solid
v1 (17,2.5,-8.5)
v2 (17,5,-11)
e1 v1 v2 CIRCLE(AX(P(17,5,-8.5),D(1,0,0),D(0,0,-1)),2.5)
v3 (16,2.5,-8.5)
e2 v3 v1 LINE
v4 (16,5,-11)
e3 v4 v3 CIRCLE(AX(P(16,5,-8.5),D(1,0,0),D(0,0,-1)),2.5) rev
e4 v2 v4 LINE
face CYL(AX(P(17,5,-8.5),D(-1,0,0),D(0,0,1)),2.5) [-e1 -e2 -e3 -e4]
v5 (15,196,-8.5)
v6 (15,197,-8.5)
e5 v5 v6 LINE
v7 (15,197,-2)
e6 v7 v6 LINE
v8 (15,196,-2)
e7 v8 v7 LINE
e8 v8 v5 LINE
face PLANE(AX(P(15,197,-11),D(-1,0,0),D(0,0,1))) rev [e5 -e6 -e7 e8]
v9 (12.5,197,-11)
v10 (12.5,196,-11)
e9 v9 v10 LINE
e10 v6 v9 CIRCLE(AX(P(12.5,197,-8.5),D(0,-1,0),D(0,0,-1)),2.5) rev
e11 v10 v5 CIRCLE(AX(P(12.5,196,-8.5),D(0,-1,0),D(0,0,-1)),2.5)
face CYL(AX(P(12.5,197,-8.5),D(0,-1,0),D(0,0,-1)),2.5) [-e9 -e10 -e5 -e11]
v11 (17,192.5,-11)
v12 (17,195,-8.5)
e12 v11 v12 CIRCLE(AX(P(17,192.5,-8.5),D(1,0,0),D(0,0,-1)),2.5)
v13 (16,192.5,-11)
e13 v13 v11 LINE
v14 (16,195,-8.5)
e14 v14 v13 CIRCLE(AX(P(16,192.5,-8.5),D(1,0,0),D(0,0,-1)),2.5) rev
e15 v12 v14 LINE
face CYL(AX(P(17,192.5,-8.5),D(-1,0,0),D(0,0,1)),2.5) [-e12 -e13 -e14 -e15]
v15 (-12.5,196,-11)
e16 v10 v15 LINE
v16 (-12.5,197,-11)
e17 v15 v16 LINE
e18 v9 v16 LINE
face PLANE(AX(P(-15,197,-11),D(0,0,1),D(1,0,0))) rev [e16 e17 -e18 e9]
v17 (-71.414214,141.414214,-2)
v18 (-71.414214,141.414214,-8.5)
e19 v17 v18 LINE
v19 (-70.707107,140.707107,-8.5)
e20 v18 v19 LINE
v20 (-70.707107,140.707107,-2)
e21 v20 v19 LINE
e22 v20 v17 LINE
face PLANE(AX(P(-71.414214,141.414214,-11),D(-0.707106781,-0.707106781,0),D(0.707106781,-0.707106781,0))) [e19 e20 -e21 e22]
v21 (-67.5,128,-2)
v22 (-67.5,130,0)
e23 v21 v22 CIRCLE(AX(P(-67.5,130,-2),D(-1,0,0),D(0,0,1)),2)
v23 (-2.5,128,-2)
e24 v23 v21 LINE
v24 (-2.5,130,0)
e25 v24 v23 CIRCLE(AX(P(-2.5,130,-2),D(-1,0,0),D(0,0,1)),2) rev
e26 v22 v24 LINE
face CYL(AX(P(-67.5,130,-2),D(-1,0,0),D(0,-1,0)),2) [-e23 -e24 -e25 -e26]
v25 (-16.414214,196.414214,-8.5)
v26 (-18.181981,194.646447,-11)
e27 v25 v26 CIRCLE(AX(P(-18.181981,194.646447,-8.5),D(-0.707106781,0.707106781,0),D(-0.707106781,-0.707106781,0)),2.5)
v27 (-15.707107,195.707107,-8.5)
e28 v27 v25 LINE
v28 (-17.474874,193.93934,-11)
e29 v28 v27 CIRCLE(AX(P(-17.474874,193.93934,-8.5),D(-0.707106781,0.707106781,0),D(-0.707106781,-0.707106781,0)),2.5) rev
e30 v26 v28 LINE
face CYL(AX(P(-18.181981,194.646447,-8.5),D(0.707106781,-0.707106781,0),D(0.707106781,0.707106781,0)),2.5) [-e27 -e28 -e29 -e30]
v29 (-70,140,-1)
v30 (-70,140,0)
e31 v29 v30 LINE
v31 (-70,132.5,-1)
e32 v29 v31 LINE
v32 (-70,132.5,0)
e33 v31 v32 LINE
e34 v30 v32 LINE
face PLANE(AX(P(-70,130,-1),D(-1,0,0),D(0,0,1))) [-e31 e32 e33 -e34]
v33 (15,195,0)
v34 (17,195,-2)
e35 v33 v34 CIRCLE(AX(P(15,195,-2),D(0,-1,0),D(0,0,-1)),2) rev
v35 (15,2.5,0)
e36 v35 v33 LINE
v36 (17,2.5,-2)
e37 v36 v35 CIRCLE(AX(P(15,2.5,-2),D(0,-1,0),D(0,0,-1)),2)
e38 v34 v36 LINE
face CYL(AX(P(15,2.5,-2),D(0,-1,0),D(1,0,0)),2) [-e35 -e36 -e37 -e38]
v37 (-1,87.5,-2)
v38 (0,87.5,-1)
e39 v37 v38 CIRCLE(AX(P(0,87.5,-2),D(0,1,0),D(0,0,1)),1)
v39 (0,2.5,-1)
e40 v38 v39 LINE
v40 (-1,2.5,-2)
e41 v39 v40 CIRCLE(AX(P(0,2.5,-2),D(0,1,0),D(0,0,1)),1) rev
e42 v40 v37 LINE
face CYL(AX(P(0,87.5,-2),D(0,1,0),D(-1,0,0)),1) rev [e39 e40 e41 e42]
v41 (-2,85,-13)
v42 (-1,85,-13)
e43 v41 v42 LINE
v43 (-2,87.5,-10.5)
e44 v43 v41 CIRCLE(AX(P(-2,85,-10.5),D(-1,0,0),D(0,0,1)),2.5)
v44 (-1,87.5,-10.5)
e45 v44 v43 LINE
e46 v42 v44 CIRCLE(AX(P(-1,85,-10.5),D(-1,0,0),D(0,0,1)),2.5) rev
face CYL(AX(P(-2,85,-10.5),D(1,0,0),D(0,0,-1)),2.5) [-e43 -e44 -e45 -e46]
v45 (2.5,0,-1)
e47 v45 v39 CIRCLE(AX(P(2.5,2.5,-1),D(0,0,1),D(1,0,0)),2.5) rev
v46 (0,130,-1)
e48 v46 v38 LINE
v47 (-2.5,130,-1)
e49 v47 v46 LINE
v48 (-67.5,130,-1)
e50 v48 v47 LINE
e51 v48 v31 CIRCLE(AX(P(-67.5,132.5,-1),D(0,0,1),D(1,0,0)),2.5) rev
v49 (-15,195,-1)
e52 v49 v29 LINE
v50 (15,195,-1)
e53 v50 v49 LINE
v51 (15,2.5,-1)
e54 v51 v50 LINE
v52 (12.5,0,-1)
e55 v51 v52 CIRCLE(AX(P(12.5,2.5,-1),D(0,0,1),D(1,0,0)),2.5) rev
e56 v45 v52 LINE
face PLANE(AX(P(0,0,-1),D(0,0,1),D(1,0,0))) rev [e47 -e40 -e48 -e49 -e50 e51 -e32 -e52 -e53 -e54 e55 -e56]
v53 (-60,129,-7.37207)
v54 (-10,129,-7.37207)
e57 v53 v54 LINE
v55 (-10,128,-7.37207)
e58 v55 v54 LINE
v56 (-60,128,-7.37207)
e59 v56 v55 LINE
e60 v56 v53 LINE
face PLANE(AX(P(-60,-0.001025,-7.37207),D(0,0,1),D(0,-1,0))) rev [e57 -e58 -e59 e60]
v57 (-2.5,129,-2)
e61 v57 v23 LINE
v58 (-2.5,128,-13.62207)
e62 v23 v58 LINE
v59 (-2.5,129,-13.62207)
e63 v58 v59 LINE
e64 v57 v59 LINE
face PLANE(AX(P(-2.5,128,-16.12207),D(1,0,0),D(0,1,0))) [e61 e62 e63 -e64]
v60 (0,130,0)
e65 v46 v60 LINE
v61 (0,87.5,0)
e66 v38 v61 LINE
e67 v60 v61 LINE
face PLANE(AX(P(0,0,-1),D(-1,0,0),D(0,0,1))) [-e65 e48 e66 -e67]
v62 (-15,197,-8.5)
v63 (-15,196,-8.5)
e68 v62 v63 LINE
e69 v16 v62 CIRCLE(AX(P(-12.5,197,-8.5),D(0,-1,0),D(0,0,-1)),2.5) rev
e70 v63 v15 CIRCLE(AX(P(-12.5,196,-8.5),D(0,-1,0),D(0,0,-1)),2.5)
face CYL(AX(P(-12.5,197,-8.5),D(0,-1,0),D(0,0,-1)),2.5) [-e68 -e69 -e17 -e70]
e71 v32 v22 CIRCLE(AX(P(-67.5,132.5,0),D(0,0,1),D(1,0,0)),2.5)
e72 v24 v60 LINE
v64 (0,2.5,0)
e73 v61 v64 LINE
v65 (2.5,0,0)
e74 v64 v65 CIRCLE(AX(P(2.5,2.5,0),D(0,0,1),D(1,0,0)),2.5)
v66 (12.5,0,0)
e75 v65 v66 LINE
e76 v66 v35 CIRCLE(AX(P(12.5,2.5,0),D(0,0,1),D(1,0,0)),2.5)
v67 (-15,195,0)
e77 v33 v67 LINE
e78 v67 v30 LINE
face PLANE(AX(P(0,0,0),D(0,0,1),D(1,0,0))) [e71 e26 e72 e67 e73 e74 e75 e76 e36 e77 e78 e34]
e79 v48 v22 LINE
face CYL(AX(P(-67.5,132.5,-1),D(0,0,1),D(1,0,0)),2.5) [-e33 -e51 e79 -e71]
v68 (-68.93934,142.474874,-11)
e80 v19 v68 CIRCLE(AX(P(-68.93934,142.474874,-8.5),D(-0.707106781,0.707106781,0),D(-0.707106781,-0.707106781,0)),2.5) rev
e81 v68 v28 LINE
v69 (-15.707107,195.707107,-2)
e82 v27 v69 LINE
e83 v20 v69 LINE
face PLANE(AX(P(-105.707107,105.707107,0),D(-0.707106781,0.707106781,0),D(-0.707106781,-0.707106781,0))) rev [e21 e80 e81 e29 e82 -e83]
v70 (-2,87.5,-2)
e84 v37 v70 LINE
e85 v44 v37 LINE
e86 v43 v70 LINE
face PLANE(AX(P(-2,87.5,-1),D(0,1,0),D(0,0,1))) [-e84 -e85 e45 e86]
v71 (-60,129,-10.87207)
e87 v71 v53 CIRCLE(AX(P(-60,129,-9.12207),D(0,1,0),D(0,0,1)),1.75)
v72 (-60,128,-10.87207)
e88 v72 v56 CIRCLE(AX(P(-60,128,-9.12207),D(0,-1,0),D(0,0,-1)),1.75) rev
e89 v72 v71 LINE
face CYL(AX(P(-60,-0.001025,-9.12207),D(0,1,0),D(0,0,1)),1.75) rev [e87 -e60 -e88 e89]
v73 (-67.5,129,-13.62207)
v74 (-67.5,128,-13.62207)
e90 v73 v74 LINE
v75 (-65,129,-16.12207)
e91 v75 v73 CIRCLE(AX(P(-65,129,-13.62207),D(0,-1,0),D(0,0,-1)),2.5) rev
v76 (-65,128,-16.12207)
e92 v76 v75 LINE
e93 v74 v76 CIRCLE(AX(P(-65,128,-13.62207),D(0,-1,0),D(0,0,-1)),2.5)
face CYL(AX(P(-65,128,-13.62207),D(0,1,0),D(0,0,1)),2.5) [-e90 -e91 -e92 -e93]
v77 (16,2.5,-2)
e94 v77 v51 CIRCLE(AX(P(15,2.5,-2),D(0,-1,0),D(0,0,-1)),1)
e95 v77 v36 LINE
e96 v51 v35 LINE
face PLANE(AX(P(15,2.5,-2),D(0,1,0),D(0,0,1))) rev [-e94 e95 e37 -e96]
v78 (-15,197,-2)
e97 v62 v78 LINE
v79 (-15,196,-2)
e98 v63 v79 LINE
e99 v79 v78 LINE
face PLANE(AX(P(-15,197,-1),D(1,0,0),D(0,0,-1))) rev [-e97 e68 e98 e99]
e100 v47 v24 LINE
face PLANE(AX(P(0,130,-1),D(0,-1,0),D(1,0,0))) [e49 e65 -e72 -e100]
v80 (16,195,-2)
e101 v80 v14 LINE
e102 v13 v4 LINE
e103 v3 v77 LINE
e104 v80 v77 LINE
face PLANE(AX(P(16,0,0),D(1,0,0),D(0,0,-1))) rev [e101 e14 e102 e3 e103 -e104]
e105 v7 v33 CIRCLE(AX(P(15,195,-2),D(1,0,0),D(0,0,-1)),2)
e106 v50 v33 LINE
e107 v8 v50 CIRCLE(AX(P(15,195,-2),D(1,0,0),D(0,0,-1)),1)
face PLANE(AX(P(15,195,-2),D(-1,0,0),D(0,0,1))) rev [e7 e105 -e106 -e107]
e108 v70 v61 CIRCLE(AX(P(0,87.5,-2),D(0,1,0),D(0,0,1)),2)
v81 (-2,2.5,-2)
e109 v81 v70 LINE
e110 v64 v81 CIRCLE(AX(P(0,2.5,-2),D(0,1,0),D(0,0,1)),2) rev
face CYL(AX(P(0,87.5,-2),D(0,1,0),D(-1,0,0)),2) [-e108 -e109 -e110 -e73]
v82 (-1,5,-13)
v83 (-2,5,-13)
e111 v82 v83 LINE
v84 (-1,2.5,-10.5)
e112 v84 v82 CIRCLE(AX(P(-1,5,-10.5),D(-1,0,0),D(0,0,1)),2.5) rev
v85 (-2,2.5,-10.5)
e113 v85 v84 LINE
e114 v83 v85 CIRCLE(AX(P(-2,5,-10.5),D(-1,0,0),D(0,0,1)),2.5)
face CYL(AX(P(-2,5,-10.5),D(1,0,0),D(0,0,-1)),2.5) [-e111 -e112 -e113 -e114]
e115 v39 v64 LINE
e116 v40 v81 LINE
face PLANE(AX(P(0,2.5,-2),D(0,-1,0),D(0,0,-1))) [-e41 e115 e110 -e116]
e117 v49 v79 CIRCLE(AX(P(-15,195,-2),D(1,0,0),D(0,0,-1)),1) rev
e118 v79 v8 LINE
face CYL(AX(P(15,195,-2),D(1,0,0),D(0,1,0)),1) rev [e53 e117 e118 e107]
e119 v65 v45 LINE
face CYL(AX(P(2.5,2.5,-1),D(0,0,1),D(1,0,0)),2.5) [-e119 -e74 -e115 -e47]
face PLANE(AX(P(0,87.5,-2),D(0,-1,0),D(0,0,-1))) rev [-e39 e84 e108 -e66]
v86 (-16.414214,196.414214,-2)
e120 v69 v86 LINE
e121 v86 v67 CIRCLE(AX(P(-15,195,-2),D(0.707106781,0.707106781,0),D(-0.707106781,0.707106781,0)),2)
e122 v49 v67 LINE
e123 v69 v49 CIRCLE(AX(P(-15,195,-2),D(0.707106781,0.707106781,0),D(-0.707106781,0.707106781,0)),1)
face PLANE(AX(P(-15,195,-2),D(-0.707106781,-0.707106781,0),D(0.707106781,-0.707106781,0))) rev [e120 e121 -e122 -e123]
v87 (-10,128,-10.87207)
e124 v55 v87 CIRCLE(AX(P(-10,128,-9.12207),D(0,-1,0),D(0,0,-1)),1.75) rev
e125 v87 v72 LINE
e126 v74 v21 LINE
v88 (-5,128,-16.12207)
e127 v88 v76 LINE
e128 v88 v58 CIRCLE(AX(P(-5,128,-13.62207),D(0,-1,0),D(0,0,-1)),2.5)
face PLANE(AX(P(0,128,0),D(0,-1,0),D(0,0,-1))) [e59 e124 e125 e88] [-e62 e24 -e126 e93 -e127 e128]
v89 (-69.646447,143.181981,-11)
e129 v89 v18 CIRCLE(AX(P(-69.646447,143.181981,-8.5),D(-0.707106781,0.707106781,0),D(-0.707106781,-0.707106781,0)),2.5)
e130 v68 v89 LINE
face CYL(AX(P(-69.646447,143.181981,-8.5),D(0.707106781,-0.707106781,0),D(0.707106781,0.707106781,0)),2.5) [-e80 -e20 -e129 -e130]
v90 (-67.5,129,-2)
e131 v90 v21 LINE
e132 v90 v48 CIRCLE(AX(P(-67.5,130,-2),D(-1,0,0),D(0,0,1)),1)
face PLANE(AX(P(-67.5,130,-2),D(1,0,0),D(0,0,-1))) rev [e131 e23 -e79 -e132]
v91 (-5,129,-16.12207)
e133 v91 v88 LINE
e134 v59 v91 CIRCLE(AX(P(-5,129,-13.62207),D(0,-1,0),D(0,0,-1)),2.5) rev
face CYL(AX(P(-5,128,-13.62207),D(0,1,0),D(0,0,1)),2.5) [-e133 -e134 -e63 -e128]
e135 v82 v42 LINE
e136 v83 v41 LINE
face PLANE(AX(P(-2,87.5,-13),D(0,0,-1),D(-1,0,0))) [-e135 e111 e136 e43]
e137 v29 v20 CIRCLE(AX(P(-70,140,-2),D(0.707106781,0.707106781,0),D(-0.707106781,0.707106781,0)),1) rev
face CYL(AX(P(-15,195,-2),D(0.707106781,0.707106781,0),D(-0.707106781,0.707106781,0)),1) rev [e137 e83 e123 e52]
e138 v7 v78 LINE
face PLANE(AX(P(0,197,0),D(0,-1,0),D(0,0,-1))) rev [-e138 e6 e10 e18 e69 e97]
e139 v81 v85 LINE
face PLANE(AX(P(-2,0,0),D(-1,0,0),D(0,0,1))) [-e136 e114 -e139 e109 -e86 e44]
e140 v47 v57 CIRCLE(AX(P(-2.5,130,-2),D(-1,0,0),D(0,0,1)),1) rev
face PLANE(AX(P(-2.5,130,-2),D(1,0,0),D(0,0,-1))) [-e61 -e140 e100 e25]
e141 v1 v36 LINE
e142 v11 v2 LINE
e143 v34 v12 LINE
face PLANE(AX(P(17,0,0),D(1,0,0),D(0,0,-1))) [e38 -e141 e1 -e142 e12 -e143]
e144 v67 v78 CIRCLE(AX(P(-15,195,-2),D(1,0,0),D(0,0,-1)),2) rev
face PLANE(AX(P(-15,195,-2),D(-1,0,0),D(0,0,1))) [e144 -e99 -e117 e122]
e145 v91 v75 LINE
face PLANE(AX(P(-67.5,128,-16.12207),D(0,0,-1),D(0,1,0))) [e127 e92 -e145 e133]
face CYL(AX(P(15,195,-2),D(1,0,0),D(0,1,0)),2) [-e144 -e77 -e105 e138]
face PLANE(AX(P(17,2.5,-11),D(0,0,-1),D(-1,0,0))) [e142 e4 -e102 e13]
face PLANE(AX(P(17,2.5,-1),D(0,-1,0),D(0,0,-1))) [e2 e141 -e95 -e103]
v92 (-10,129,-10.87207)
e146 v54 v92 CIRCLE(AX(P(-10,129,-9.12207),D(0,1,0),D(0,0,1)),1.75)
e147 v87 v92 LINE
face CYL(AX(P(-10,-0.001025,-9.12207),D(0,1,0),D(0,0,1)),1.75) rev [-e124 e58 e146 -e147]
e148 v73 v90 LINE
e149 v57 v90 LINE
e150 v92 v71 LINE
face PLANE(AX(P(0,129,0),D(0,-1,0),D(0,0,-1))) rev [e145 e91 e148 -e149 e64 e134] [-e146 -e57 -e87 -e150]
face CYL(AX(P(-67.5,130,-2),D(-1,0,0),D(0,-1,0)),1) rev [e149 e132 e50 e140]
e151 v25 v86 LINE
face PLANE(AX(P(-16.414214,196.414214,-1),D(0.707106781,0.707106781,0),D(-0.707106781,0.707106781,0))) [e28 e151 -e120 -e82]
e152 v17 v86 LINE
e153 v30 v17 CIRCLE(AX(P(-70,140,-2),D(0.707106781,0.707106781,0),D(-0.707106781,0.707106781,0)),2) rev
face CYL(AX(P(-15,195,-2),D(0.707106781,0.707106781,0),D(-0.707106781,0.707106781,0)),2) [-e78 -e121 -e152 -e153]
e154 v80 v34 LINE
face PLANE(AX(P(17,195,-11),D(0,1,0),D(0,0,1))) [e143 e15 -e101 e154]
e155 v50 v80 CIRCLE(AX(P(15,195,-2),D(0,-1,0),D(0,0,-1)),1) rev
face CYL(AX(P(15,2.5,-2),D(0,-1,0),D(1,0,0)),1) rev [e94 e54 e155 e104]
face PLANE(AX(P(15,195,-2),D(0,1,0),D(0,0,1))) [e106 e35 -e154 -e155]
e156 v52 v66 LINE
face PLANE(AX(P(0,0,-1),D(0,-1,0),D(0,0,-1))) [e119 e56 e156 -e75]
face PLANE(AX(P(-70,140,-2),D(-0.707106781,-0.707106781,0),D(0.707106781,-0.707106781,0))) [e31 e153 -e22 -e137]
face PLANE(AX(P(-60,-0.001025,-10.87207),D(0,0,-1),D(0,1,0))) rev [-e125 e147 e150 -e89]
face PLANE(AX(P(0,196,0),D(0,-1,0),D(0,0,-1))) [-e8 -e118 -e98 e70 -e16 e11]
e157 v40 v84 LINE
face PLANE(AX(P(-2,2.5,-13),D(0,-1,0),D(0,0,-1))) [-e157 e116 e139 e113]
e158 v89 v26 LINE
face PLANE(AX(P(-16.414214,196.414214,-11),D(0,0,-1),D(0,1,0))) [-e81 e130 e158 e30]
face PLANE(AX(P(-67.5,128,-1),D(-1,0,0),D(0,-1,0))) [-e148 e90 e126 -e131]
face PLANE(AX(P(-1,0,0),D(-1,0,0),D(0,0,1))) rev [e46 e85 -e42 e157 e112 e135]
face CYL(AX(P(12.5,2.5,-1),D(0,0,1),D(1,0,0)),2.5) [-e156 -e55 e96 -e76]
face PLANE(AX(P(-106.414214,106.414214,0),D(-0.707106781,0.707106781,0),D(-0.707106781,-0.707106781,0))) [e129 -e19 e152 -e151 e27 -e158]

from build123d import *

# Parameters (mm, degrees)
BASE_FLANGE1_DEPTH    = 1
EDGE_FLANGE2_DEPTH    = 85
EDGE_FLANGE3_DEPTH    = 192.5
EDGE_FLANGE1_DEPTH    = 65
EDGE_FLANGE4_DEPTH    = 77.781745931
EDGE_FLANGE5_DEPTH    = 30
BREAK_CORNER1_START   = 128
BREAK_CORNER1_DEPTH   = 69
BREAK_CORNER1_START_2 = 196
BREAK_CORNER1_2_DEPTH = 1
BREAK_CORNER1_START_3 = -150.492424049
BREAK_CORNER1_3_DEPTH = 1
BREAK_CORNER1_START_4 = -2
BREAK_CORNER1_4_DEPTH = 19
BREAK_CORNER1_START_5 = 16
BREAK_CORNER1_5_DEPTH = 1
BREAK_CORNER1_6_DEPTH = 1
BREAK_CORNER1_START_6 = -1
BREAK_CORNER1_7_DEPTH = 1
CUT_EXTRUDE1_REACH    = 150.327


# Read off the part's stored shape, not the designer's step: Break-Corner1
# Sheet-metal steps are written as plain solids
with BuildPart() as part:
    # Sketch1 → Base-Flange1 (new body)
    with BuildSketch(Plane.XY):
        Polygon((0, 130), (-70, 130), (-70, 140), (-15, 195), (15, 195), (15, 130), (15, 0), (0, 0), align=None)
    extrude(amount=-BASE_FLANGE1_DEPTH)

    # Edge-Flange2 section (across the edge) → Edge-Flange2 (add)
    with BuildSketch(Plane(origin=(-1, 2.5, -1), x_dir=(1, 0, 0), z_dir=(0, 1, 0))):
        with BuildLine():
            Line((-1, 1), (-1, 12))
            Line((-1, 12), (0, 12))
            Line((0, 12), (0, 1))
            ThreePointArc((0, 1), (0.292893219, 0.292893219), (1, 0))
            Line((1, 0), (1, -1))
            ThreePointArc((1, -1), (-0.414213562, -0.414213562), (-1, 1))
        make_face()
    extrude(amount=EDGE_FLANGE2_DEPTH)

    # Edge-Flange3 section (across the edge) → Edge-Flange3 (add)
    with BuildSketch(Plane(origin=(16, 195, -1), x_dir=(-1, 0, 0), z_dir=(0, -1, 0))):
        with BuildLine():
            Line((-1, 1), (-1, 10))
            Line((-1, 10), (0, 10))
            Line((0, 10), (0, 1))
            ThreePointArc((0, 1), (0.292893219, 0.292893219), (1, 0))
            Line((1, 0), (1, -1))
            ThreePointArc((1, -1), (-0.414213562, -0.414213562), (-1, 1))
        make_face()
    extrude(amount=EDGE_FLANGE3_DEPTH)

    # Edge-Flange1 section (across the edge) → Edge-Flange1 (add)
    with BuildSketch(Plane(origin=(-2.5, 129, -1), x_dir=(0, 1, 0), z_dir=(-1, 0, 0))):
        with BuildLine():
            Line((-1, 1), (-1, 15.122069622))
            Line((-1, 15.122069622), (0, 15.122069622))
            Line((0, 15.122069622), (0, 1))
            ThreePointArc((0, 1), (0.292893219, 0.292893219), (1, 0))
            Line((1, 0), (1, -1))
            ThreePointArc((1, -1), (-0.414213562, -0.414213562), (-1, 1))
        make_face()
    extrude(amount=EDGE_FLANGE1_DEPTH)

    # Edge-Flange4 section (across the edge) → Edge-Flange4 (add)
    with BuildSketch(Plane(origin=(-70.707106781, 140.707106781, -1), x_dir=(0.7071067811865439, -0.7071067811865512, -3.4914813388431337e-15), z_dir=(0.7071067811865512, 0.7071067811865439, 0))):
        with BuildLine():
            Line((-1, 1), (-1, 10))
            Line((-1, 10), (0, 10))
            Line((0, 10), (0, 1))
            ThreePointArc((0, 1), (0.292893219, 0.292893219), (1, 0))
            Line((1, 0), (1, -1))
            ThreePointArc((1, -1), (-0.414213562, -0.414213562), (-1, 1))
        make_face()
    extrude(amount=EDGE_FLANGE4_DEPTH)

    # Edge-Flange5 section (across the edge) → Edge-Flange5 (add)
    with BuildSketch(Plane(origin=(-15, 196, -1), x_dir=(0, -1, 0), z_dir=(1, 0, 0))):
        with BuildLine():
            Line((-1, 1), (-1, 10))
            Line((-1, 10), (0, 10))
            Line((0, 10), (0, 1))
            ThreePointArc((0, 1), (0.292893219, 0.292893219), (1, 0))
            Line((1, 0), (1, -1))
            ThreePointArc((1, -1), (-0.414213562, -0.414213562), (-1, 1))
        make_face()
    extrude(amount=EDGE_FLANGE5_DEPTH)

    # Break-Corner1 outline → Break-Corner1 (cut)
    with BuildSketch(Plane(origin=(0, 0, 0), x_dir=(1, 0, 0), z_dir=(0, 1, 0)).offset(BREAK_CORNER1_START)):
        with BuildLine():
            ThreePointArc((-67.5, 13.622069622), (-66.767766953, 15.389836575), (-65, 16.122069622))
            Line((-65, 16.122069622), (-67.5, 16.122069622))
            Line((-67.5, 16.122069622), (-67.5, 13.622069622))
        make_face()
        with BuildLine():
            ThreePointArc((-5, 16.122069622), (-3.232233047, 15.389836575), (-2.5, 13.622069622))
            Line((-2.5, 13.622069622), (-2.5, 16.122069622))
            Line((-2.5, 16.122069622), (-5, 16.122069622))
        make_face()
        with BuildLine():
            Line((15, 11), (12.5, 11))
            ThreePointArc((12.5, 11), (14.267766953, 10.267766953), (15, 8.5))
            Line((15, 8.5), (15, 11))
        make_face()
    extrude(amount=BREAK_CORNER1_DEPTH, mode=Mode.SUBTRACT)

    # Break-Corner1 2 outline → Break-Corner1 2 (cut)
    with BuildSketch(Plane(origin=(0, 0, 0), x_dir=(1, 0, 0), z_dir=(0, 1, 0)).offset(BREAK_CORNER1_START_2)):
        with BuildLine():
            Line((-15, 11), (-15, 8.5))
            ThreePointArc((-15, 8.5), (-14.267766953, 10.267766953), (-12.5, 11))
            Line((-12.5, 11), (-15, 11))
        make_face()
    extrude(amount=BREAK_CORNER1_2_DEPTH, mode=Mode.SUBTRACT)

    # Break-Corner1 3 outline → Break-Corner1 3 (cut)
    with BuildSketch(Plane(origin=(0, 0, 0), x_dir=(0.7071067811865509, 0.707106781186544, 0), z_dir=(0.707106781186544, -0.707106781186551, 0)).offset(BREAK_CORNER1_START_3)):
        with BuildLine():
            Line((49.497474683, -11), (51.997474683, -11))
            ThreePointArc((51.997474683, -11), (50.22970773, -10.267766953), (49.497474683, -8.5))
            Line((49.497474683, -8.5), (49.497474683, -11))
        make_face()
        with BuildLine():
            ThreePointArc((127.279220614, -8.5), (126.546987567, -10.267766953), (124.779220614, -11))
            Line((124.779220614, -11), (127.279220614, -11))
            Line((127.279220614, -11), (127.279220614, -8.5))
        make_face()
    extrude(amount=BREAK_CORNER1_3_DEPTH, mode=Mode.SUBTRACT)

    # Break-Corner1 4 outline → Break-Corner1 4 (cut)
    with BuildSketch(Plane.YZ.offset(BREAK_CORNER1_START_4)):
        with BuildLine():
            ThreePointArc((195, -8.5), (194.267766953, -10.267766953), (192.5, -11))
            Line((192.5, -11), (195, -11))
            Line((195, -11), (195, -8.5))
        make_face()
        with BuildLine():
            ThreePointArc((87.449489743, -11), (86.58113883, -12.436491673), (85, -13))
            Line((85, -13), (87.5, -13))
            Line((87.5, -13), (87.5, -11))
            Line((87.5, -11), (87.449489743, -11))
        make_face()
        with BuildLine():
            Line((2.5, -13), (5, -13))
            ThreePointArc((5, -13), (3.232233047, -12.267766953), (2.5, -10.5))
            Line((2.5, -10.5), (2.5, -13))
        make_face()
    extrude(amount=BREAK_CORNER1_4_DEPTH, mode=Mode.SUBTRACT)

    # Break-Corner1 5 outline → Break-Corner1 5 (cut)
    with BuildSketch(Plane.YZ.offset(BREAK_CORNER1_START_5)):
        with BuildLine():
            Line((2.550510257, -11), (5, -11))
            ThreePointArc((5, -11), (3.232233047, -10.267766953), (2.5, -8.5))
            Line((2.5, -8.5), (2.5, -10.5))
            ThreePointArc((2.5, -10.5), (2.512659617, -10.751272405), (2.550510257, -11))
        make_face()
    extrude(amount=BREAK_CORNER1_5_DEPTH, mode=Mode.SUBTRACT)

    # Break-Corner1 6 outline → Break-Corner1 6 (cut)
    with BuildSketch(Plane.YZ.offset(BREAK_CORNER1_START_4)):
        with BuildLine():
            ThreePointArc((87.5, -10.5), (87.487340383, -10.751272405), (87.449489743, -11))
            Line((87.449489743, -11), (87.5, -11))
            Line((87.5, -11), (87.5, -10.5))
        make_face()
    extrude(amount=BREAK_CORNER1_6_DEPTH, mode=Mode.SUBTRACT)

    # Break-Corner1 7 outline → Break-Corner1 7 (cut)
    with BuildSketch(Plane.XY.offset(BREAK_CORNER1_START_6)):
        with BuildLine():
            ThreePointArc((-67.5, 130), (-69.267766953, 130.732233047), (-70, 132.5))
            Line((-70, 132.5), (-70, 130))
            Line((-70, 130), (-67.5, 130))
        make_face()
        with BuildLine():
            Line((0, 0), (2.5, 0))
            ThreePointArc((2.5, 0), (0.732233047, 0.732233047), (0, 2.5))
            Line((0, 2.5), (0, 0))
        make_face()
        with BuildLine():
            ThreePointArc((15, 2.5), (14.267766953, 0.732233047), (12.5, 0))
            Line((12.5, 0), (15, 0))
            Line((15, 0), (15, 2.5))
        make_face()
    extrude(amount=BREAK_CORNER1_7_DEPTH, mode=Mode.SUBTRACT)

    # Sketch15 → Cut-Extrude1 (cut, up to next)
    with BuildSketch(Plane(origin=(0, 129, 0), x_dir=(1, 0, 0), z_dir=(0, 1, 0)), mode=Mode.PRIVATE) as cut_extrude1_sk1:
        with BuildLine():
            Line((-60, 10.872069622), (-10, 10.872069622))
            ThreePointArc((-10, 10.872069622), (-8.25, 9.122069622), (-10, 7.372069622))
            Line((-10, 7.372069622), (-60, 7.372069622))
            ThreePointArc((-60, 7.372069622), (-61.75, 9.122069622), (-60, 10.872069622))
        make_face()
    cut_extrude1_tool1 = extrude(cut_extrude1_sk1.sketch, amount=-CUT_EXTRUDE1_REACH, mode=Mode.PRIVATE) & part.part
    add(cut_extrude1_tool1.solids().sort_by_distance((-35, 129, -9.12207))[0], mode=Mode.SUBTRACT)


solid = part.part
